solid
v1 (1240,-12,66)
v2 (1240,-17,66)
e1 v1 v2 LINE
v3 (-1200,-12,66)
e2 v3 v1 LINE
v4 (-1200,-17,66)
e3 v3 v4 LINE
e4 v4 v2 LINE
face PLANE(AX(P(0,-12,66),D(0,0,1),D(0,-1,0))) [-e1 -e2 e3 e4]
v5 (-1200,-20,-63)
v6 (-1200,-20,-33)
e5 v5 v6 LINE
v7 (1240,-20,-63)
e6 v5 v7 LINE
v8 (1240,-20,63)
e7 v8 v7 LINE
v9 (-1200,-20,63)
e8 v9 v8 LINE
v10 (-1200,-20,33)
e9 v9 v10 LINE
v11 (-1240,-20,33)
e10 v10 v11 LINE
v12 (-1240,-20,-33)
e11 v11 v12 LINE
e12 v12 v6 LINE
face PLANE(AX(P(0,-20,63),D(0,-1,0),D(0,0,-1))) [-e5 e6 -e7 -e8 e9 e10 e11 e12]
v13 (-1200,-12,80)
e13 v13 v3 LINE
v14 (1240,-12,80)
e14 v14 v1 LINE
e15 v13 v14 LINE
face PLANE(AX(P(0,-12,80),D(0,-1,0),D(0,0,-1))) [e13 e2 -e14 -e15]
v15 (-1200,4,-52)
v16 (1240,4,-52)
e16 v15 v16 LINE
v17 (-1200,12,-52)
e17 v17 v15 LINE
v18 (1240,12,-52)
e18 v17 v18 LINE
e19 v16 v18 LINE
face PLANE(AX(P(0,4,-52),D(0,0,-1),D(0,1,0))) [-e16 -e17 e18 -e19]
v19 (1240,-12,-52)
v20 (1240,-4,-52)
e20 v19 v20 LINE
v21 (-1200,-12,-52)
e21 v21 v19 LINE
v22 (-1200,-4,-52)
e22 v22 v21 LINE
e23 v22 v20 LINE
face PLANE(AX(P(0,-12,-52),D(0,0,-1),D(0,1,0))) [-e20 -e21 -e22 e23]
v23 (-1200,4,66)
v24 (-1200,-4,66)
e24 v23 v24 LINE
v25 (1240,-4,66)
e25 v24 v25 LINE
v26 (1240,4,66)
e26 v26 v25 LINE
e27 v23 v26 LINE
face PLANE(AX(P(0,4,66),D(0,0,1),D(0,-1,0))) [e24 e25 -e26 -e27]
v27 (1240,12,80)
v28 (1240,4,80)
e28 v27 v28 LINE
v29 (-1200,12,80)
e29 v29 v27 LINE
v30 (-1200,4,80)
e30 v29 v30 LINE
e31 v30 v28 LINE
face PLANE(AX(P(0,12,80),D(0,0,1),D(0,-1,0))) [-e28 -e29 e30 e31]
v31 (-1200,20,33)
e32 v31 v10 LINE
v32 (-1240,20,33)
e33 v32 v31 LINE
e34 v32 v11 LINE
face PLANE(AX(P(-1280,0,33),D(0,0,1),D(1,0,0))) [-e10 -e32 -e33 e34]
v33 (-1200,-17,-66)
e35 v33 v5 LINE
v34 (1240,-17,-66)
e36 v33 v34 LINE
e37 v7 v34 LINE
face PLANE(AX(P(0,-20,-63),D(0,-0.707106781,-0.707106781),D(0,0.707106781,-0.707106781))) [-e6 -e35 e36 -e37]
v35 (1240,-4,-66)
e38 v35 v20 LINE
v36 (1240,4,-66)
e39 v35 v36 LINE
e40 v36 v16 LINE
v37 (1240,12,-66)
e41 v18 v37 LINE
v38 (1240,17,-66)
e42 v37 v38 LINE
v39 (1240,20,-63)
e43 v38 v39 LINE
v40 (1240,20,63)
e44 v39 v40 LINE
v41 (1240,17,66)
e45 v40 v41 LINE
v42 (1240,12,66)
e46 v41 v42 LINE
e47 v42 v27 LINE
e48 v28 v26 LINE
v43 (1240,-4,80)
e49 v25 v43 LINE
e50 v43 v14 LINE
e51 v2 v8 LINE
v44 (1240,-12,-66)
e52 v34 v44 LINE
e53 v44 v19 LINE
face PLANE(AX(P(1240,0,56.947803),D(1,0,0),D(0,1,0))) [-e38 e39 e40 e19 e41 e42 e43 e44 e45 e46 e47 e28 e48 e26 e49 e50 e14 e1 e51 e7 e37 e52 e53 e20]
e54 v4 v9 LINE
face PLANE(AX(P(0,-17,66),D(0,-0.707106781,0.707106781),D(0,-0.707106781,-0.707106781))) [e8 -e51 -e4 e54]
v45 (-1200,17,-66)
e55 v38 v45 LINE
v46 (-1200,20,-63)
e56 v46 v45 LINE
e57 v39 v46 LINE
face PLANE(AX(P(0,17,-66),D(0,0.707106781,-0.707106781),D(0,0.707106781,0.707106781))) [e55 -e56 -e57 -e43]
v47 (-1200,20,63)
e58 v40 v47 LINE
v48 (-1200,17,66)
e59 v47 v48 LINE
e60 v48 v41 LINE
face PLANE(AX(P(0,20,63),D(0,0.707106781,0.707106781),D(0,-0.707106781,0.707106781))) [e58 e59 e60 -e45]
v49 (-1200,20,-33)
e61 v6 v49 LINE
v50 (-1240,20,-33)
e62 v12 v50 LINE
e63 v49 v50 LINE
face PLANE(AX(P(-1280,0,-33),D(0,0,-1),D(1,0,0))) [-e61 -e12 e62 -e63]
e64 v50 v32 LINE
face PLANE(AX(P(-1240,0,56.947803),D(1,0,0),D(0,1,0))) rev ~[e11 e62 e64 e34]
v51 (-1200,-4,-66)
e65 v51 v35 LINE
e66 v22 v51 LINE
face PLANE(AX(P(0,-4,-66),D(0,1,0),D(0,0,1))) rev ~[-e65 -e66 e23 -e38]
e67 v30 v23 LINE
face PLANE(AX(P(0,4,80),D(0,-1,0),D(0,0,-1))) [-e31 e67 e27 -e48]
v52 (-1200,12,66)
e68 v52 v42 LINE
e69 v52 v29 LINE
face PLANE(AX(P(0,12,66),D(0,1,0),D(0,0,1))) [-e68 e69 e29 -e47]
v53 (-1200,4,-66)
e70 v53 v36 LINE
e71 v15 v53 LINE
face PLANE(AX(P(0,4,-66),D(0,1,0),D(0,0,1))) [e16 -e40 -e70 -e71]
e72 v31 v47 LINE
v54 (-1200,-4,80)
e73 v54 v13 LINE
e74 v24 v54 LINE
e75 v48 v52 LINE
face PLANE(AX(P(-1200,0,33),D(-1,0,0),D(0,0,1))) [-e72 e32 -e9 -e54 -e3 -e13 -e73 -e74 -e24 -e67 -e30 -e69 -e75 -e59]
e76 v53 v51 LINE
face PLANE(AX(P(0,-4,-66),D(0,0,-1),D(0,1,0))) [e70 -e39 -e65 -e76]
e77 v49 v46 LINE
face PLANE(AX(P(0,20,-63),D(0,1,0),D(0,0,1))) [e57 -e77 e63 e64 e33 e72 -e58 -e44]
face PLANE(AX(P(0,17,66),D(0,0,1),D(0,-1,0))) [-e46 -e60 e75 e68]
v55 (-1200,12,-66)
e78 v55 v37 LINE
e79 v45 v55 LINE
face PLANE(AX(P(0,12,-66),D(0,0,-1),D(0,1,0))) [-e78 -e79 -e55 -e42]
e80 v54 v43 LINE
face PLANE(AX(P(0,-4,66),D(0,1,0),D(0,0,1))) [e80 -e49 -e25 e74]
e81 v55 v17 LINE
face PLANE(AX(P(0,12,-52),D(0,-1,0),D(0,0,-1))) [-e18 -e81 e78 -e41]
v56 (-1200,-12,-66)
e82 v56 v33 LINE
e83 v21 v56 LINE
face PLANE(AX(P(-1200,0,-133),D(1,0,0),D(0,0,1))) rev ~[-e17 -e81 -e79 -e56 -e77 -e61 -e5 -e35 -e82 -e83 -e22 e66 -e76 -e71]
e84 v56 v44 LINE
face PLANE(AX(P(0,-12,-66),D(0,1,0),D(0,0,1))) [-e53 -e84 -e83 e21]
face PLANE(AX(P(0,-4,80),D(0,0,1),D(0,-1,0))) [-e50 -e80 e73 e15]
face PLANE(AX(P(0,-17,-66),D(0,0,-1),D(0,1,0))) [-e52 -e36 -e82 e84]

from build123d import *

# Parameters (mm, degrees)
F1_W     = 40
F1_H     = 33
F1_W_2   = 8
F1_H_2   = 14
F3_DEPTH = 1240
F2_W     = 80
F2_H     = 100
F4_DEPTH = 25


with BuildPart() as f3:
    # F1 (on Right) → F3 (new body, symmetric)
    with BuildSketch(Plane.YZ):
        Polygon((20, 33), (20, 63), (17, 66), (12, 66), (12, 80), (4, 80), (4, 66), (-4, 66), (-4, 80), (-12, 80), (-12, 66), (-17, 66), (-20, 63), (-20, 33), align=None)
        with Locations((0, 16.5)):
            Rectangle(F1_W, F1_H)
        with Locations((0, -16.5)):
            Rectangle(F1_W, F1_H)
        Polygon((20, -52), (20, -33), (-20, -33), (-20, -52), (-12, -52), (-4, -52), (4, -52), (12, -52), align=None)
        Polygon((-12, -52), (-20, -52), (-20, -63), (-17, -66), (-12, -66), align=None)
        with Locations((0, -59)):
            Rectangle(F1_W_2, F1_H_2)
        Polygon((20, -63), (20, -52), (12, -52), (12, -66), (17, -66), align=None)
    extrude(amount=F3_DEPTH, both=True)

    # F2 (on Front) → F4 (cut, symmetric)
    with BuildSketch(Plane.XZ):
        with Locations((-1240, 83)):
            Rectangle(F2_W, F2_H)
        with Locations((-1240, -83)):
            Rectangle(F2_W, F2_H)
    extrude(amount=F4_DEPTH, both=True, mode=Mode.SUBTRACT)


solid = f3.part
